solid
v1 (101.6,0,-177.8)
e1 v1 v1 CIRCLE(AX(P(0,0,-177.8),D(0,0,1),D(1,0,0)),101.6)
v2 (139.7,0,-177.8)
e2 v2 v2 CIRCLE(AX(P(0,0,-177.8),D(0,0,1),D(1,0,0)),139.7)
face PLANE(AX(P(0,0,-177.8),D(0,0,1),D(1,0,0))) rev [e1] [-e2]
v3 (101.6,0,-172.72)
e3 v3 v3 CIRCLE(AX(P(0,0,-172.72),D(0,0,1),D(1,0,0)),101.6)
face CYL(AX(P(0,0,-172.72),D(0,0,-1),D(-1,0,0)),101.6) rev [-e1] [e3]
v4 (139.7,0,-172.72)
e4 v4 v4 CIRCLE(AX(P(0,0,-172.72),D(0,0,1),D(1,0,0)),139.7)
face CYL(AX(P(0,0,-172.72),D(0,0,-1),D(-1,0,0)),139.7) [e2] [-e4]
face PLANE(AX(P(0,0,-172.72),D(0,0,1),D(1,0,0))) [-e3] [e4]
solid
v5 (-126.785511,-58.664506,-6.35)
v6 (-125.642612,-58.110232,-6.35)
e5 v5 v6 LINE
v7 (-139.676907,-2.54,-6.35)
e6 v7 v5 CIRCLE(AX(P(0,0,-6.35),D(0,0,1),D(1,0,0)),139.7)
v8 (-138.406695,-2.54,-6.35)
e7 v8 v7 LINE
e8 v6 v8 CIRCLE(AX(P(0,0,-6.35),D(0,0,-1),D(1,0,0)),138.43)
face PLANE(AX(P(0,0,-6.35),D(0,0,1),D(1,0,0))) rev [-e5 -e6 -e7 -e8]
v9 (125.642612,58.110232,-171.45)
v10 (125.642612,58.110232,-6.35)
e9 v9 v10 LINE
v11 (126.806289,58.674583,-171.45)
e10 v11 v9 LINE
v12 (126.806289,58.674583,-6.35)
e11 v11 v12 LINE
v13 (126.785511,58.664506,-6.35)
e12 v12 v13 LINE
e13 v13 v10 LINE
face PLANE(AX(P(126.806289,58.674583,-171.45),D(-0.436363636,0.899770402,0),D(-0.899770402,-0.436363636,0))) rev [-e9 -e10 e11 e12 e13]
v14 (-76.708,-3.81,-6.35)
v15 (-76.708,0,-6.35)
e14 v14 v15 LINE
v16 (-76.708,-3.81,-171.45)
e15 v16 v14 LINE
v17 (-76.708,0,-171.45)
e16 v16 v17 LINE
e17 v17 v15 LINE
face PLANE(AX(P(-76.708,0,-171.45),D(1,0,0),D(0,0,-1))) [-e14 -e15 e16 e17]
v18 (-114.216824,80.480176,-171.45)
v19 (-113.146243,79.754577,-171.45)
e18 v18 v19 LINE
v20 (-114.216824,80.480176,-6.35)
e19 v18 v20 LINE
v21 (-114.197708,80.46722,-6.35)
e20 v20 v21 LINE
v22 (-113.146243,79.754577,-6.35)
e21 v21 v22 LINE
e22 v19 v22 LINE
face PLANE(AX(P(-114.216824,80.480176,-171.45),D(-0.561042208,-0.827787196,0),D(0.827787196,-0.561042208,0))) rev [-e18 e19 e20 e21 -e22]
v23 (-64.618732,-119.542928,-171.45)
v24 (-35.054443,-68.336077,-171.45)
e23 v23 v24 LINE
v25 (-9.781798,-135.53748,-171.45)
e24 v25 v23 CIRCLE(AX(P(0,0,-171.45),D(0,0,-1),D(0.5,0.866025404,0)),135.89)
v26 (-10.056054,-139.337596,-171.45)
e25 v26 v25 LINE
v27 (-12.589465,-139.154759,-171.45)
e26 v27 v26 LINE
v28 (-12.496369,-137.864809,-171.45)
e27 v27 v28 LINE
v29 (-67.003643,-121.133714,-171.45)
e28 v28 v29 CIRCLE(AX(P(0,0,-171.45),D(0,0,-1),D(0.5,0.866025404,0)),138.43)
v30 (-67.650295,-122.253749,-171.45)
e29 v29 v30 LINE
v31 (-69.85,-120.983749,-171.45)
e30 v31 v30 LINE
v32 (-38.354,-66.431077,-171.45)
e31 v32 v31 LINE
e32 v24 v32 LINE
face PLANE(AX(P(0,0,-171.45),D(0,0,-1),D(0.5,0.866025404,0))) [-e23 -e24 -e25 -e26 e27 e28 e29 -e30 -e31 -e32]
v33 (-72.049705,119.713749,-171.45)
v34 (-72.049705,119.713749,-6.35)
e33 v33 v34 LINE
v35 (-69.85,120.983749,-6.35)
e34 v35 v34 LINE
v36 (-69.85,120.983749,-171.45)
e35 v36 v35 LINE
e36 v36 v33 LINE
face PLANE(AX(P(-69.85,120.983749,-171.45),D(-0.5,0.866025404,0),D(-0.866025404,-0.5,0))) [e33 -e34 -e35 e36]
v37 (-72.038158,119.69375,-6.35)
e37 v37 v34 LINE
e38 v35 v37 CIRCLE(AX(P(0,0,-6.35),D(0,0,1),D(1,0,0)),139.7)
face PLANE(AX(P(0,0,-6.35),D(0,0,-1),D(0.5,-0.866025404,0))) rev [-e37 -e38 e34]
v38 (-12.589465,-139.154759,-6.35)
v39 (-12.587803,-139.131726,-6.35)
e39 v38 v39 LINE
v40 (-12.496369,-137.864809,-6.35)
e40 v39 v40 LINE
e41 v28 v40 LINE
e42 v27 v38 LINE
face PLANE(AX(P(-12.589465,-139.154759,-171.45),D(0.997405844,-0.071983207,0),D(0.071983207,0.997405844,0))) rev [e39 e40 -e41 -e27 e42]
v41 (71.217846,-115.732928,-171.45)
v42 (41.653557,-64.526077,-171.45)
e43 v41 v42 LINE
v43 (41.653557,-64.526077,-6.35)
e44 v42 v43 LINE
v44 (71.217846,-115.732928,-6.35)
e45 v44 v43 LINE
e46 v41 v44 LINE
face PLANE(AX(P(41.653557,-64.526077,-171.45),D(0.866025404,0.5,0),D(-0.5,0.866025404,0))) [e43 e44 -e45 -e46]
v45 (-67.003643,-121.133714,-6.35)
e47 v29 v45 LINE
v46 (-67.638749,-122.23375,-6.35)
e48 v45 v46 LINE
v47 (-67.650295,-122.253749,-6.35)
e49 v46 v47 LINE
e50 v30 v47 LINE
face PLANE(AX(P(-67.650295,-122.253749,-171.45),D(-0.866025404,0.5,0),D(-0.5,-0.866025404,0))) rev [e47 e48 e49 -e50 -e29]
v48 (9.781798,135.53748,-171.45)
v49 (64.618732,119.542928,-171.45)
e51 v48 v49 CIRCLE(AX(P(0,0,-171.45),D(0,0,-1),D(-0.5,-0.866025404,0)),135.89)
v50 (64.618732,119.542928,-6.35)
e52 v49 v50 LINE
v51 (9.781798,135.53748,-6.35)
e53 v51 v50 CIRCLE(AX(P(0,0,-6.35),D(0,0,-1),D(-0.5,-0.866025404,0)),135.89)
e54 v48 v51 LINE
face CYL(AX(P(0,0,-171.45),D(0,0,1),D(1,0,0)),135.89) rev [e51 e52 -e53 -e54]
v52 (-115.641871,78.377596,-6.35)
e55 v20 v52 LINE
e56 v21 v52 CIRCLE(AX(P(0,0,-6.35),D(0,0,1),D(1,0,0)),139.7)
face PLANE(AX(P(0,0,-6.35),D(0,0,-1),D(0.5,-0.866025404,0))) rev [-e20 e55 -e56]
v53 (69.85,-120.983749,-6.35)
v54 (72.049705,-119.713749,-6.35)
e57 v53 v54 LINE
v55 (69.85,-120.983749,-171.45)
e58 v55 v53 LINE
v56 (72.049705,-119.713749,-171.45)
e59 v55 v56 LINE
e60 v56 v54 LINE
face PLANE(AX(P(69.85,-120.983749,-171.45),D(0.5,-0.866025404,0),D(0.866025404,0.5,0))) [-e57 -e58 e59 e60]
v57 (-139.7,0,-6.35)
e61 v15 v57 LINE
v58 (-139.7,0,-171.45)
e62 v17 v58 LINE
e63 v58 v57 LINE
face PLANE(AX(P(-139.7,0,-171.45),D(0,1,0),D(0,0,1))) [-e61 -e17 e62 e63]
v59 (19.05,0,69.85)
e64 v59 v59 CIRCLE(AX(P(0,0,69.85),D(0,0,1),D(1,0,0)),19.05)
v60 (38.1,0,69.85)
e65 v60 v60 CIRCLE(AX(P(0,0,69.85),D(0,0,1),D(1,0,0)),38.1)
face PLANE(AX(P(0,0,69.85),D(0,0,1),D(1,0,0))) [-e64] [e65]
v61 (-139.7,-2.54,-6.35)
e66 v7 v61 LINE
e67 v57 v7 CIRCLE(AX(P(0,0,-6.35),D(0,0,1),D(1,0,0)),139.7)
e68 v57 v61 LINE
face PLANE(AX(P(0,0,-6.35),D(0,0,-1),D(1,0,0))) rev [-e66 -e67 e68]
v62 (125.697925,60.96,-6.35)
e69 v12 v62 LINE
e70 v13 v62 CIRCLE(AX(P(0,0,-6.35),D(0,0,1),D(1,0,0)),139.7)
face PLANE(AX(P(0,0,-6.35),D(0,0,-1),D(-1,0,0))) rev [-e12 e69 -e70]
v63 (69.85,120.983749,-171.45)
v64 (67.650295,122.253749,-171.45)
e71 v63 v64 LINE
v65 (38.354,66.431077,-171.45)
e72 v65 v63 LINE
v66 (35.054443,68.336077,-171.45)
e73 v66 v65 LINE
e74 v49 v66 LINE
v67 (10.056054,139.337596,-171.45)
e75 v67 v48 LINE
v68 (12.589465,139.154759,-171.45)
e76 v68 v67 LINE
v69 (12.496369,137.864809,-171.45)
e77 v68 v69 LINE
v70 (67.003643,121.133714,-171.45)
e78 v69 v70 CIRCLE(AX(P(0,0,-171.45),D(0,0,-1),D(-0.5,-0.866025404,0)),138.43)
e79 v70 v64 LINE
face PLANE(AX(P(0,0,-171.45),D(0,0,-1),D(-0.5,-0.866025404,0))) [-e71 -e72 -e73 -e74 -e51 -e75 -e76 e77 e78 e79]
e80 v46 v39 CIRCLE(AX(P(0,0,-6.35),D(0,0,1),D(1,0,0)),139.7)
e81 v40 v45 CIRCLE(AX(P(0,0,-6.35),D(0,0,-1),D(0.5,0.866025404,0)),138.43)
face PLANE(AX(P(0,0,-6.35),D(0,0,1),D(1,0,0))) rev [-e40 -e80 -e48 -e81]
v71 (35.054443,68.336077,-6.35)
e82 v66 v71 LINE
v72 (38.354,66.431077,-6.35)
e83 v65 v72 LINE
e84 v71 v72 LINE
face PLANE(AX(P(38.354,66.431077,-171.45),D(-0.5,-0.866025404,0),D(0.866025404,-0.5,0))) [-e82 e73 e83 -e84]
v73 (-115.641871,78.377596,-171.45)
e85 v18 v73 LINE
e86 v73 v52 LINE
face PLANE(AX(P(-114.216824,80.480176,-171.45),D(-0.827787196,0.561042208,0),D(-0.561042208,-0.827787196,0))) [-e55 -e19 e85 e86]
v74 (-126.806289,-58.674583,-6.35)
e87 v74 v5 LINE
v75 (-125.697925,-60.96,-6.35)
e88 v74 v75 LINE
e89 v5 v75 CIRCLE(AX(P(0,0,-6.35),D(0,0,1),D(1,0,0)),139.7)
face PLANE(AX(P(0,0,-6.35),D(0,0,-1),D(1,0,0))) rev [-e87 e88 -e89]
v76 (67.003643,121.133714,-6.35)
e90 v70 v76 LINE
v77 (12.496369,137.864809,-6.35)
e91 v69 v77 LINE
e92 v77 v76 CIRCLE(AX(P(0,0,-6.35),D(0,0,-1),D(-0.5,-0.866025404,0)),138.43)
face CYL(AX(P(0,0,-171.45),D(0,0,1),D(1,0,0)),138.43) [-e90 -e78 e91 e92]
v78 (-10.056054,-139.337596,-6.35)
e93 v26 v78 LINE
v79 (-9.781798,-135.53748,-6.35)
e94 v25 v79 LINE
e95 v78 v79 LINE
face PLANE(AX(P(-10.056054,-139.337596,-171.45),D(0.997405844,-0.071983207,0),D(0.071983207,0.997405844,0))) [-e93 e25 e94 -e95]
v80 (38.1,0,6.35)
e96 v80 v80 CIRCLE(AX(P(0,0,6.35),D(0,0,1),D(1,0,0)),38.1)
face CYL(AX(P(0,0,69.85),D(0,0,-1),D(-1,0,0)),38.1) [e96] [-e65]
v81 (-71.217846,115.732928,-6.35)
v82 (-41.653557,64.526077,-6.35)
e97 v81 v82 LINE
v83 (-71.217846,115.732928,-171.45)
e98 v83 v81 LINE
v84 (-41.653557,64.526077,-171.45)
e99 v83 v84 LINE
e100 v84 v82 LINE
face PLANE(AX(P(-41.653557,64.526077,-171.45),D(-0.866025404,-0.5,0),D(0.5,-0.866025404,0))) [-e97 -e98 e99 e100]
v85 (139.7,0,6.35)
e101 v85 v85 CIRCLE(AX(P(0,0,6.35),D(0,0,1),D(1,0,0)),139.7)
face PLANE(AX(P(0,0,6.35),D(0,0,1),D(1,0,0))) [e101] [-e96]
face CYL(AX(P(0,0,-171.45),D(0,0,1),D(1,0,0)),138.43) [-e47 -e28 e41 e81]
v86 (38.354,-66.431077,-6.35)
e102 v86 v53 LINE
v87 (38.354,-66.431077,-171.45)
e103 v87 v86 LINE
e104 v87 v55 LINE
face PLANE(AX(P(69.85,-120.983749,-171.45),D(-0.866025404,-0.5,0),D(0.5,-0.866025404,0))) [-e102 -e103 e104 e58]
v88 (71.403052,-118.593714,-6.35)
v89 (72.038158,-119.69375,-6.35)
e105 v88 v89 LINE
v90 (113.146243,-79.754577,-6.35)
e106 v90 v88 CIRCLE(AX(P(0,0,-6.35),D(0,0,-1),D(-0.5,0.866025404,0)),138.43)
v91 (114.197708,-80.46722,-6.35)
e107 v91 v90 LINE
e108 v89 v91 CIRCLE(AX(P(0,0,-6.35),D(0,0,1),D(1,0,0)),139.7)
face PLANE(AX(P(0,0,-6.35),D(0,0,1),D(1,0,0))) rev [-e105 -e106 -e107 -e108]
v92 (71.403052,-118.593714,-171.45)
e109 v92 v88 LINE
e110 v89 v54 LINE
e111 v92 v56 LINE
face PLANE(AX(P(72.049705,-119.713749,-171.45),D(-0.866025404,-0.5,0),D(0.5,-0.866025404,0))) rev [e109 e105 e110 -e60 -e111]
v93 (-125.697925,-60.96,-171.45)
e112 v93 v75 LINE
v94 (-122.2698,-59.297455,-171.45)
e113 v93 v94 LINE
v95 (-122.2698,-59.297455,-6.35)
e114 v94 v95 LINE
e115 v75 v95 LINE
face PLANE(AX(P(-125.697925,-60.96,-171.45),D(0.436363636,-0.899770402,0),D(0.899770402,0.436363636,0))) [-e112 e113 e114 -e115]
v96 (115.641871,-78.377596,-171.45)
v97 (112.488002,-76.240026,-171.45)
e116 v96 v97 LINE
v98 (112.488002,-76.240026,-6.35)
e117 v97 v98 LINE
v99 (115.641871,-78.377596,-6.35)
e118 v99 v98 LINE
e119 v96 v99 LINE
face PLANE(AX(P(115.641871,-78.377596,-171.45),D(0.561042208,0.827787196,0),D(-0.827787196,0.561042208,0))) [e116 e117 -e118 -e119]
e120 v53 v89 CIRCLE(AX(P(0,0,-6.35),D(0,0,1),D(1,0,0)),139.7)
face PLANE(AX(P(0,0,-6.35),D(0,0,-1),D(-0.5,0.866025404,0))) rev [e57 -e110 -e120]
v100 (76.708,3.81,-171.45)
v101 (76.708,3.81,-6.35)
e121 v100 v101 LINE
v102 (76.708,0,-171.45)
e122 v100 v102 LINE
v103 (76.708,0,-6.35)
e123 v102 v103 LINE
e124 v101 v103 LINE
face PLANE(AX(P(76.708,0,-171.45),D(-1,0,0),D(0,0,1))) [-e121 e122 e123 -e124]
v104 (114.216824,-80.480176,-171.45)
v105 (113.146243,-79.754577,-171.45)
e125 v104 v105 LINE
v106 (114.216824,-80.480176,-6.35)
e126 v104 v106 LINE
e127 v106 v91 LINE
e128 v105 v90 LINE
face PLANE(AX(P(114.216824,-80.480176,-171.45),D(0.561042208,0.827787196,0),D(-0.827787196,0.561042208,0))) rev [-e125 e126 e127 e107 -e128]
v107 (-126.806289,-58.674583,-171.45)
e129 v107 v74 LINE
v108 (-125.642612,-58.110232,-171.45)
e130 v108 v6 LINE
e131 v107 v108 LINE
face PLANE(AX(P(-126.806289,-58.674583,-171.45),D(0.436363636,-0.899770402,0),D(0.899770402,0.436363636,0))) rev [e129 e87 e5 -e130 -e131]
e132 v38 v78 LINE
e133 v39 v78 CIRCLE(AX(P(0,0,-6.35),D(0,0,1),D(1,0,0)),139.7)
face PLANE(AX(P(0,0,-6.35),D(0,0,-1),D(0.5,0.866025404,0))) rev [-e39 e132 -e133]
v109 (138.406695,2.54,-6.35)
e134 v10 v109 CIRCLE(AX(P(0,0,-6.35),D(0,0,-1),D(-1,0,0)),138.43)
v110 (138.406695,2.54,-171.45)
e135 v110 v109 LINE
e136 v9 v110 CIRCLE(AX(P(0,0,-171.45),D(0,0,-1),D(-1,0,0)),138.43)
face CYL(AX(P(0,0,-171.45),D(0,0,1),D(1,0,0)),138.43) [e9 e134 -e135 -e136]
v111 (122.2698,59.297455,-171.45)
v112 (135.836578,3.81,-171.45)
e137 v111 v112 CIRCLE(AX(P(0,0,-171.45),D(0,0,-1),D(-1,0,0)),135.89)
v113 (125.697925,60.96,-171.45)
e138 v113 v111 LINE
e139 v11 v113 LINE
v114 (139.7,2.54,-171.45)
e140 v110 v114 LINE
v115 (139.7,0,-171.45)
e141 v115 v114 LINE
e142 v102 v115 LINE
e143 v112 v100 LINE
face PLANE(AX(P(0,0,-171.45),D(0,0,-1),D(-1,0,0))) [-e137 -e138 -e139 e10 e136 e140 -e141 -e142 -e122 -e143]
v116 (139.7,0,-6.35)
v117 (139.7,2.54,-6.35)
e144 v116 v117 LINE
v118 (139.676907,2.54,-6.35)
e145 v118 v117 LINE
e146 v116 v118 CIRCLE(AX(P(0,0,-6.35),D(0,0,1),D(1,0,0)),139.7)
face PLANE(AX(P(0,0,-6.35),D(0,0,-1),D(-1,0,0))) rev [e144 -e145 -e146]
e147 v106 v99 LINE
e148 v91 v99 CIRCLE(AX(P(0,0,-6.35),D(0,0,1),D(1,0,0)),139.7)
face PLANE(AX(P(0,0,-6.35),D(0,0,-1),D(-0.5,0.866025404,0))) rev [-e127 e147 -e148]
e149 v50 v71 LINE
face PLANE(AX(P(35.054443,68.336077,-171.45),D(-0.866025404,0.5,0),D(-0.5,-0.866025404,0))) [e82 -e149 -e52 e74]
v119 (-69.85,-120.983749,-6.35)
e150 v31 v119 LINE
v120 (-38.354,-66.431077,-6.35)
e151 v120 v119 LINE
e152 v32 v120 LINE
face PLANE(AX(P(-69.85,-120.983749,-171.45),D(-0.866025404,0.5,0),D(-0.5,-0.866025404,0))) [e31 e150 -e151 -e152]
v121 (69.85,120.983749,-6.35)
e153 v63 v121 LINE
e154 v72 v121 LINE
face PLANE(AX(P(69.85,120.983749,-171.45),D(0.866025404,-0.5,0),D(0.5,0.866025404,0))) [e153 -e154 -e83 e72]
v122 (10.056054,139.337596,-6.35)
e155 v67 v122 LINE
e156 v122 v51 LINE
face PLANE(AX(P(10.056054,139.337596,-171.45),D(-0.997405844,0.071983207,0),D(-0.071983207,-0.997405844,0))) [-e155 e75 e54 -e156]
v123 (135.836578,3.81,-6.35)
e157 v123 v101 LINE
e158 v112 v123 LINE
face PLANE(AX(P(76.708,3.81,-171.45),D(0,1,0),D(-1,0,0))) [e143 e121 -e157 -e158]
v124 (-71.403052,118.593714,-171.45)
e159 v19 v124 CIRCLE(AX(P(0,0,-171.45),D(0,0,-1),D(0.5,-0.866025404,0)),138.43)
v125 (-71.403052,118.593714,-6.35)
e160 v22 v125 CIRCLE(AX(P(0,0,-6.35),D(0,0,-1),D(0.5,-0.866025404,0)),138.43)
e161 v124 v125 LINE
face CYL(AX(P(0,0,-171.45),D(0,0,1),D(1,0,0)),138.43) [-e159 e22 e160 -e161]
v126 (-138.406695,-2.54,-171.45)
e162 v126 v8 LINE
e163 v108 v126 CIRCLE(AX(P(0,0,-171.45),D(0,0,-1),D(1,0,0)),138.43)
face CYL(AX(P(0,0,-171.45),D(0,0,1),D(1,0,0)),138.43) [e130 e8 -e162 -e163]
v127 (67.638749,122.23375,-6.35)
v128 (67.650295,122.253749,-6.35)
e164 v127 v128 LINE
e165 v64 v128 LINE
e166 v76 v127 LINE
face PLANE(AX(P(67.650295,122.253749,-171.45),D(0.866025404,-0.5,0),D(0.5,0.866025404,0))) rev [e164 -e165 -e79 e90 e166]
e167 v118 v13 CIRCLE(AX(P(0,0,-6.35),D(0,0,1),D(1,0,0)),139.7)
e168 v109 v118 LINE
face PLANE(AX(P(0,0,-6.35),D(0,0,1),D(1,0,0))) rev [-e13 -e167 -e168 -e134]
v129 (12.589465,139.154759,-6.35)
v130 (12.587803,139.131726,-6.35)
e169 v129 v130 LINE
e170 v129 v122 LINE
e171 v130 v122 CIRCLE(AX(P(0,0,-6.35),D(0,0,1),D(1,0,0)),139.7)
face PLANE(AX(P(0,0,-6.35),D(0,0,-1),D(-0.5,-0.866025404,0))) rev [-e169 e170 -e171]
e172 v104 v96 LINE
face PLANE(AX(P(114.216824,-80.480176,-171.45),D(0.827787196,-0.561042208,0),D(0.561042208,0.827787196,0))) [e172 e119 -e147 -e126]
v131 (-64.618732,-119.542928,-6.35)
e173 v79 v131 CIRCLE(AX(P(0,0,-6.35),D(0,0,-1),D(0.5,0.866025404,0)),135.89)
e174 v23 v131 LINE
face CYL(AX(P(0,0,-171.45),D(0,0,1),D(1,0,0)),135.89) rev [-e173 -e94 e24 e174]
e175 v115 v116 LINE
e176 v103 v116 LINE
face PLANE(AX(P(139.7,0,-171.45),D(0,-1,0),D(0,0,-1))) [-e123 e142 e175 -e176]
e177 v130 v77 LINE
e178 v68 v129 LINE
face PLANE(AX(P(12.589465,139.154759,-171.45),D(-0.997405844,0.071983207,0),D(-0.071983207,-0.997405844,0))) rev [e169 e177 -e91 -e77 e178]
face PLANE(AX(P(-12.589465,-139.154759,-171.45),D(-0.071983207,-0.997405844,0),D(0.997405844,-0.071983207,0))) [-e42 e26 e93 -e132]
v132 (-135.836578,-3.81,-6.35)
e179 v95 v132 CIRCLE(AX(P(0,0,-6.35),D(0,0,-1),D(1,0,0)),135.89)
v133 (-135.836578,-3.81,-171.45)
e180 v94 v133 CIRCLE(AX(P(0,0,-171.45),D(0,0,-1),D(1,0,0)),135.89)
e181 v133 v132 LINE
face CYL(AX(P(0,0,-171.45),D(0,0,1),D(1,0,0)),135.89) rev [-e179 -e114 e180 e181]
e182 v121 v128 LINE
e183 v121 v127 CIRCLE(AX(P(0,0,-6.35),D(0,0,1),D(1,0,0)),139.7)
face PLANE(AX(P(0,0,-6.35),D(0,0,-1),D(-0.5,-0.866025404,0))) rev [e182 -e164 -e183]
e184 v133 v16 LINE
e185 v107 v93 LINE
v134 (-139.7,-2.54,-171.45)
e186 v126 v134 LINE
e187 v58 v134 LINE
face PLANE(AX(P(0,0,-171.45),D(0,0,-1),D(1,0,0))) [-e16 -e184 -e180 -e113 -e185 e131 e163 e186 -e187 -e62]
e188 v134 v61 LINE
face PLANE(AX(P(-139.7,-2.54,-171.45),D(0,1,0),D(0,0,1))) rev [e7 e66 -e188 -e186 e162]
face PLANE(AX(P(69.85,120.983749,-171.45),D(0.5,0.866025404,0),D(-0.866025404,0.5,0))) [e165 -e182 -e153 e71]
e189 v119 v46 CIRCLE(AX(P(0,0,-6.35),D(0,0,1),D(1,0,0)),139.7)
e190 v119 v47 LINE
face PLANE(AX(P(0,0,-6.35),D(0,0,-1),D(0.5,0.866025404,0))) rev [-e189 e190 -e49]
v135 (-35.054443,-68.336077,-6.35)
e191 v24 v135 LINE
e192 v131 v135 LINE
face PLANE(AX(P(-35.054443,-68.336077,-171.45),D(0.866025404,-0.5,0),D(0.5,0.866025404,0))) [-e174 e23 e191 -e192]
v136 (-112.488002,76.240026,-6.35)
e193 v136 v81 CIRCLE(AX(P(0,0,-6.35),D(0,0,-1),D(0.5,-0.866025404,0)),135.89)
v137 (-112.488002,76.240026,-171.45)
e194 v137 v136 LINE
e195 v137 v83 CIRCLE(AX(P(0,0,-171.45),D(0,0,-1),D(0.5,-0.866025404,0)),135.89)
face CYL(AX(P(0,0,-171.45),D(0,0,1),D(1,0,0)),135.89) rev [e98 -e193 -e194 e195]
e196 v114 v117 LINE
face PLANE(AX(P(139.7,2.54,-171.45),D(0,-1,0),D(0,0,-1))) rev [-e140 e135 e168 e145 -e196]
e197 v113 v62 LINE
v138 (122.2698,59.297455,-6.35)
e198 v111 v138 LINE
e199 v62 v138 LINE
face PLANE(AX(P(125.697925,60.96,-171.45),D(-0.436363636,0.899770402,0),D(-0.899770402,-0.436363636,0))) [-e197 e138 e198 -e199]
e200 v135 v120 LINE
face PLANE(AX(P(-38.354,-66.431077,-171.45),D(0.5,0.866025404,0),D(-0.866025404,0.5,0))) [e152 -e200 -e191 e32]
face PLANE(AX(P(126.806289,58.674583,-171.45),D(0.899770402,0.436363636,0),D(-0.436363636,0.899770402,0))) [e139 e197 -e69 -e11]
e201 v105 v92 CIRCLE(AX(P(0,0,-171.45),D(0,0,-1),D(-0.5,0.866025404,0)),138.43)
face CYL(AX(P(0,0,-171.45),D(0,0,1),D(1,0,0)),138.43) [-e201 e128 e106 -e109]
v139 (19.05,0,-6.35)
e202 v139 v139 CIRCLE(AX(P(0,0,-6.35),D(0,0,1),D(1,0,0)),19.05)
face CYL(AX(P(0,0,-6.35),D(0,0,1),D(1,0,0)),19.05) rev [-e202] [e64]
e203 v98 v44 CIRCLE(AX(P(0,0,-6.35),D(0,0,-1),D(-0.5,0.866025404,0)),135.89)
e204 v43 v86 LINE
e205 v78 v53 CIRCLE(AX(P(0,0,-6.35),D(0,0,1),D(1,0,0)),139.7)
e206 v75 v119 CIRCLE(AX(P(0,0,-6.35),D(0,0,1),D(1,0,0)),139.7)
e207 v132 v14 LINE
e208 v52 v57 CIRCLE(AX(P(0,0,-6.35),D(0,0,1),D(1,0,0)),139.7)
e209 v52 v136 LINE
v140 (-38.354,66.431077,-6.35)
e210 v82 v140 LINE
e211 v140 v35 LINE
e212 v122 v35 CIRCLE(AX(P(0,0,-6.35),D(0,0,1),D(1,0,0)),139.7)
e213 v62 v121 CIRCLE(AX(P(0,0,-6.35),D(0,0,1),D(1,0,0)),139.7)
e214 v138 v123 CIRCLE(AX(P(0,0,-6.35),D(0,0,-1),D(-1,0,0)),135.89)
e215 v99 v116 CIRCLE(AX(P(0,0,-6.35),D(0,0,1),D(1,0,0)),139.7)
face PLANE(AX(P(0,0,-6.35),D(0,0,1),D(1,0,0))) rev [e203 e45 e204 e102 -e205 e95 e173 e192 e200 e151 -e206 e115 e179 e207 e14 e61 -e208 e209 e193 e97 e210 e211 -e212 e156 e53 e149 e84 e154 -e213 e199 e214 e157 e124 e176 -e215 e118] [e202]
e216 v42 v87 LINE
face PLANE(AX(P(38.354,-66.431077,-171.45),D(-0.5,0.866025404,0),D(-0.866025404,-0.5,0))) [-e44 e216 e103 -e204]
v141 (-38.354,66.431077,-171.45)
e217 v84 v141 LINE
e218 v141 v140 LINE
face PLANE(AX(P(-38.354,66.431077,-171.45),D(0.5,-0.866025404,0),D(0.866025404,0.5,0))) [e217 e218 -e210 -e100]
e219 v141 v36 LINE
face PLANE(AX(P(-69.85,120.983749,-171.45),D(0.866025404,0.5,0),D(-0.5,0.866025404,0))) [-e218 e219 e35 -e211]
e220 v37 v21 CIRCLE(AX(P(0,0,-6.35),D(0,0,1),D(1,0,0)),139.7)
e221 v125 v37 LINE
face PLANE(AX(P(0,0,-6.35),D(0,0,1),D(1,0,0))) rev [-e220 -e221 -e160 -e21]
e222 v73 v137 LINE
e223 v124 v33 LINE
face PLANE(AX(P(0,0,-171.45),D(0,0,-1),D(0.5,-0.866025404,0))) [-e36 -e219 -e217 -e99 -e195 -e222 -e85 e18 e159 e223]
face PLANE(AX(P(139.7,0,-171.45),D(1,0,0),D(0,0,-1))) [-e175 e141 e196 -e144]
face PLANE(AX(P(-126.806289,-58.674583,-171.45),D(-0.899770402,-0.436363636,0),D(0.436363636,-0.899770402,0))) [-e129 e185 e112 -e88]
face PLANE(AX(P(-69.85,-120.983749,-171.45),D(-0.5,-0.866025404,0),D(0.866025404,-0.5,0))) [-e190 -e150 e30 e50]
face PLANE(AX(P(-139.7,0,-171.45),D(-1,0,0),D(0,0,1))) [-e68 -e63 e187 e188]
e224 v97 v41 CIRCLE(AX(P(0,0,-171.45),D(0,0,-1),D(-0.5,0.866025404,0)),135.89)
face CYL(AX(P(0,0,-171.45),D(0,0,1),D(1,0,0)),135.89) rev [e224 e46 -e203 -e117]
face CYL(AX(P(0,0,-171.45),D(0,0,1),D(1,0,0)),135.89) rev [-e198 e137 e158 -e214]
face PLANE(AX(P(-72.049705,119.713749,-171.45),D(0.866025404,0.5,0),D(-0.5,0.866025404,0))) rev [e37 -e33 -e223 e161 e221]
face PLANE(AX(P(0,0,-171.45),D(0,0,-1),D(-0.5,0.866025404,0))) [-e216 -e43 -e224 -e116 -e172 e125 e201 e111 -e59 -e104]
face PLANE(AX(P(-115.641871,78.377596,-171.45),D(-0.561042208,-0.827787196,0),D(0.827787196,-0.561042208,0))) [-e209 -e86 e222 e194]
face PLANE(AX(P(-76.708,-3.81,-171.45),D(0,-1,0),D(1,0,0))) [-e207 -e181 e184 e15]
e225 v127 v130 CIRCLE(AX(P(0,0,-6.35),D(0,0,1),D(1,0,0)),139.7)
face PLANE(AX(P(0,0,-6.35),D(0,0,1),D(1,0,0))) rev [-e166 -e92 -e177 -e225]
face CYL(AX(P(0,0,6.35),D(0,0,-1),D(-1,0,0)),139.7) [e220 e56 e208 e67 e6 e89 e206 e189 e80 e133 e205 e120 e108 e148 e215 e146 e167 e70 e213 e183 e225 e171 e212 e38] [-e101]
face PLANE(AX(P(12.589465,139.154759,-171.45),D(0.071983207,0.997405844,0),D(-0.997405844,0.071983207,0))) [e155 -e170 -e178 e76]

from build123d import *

# Parameters (mm, degrees)
SKETCH1_R           = 139.7
BOSS_EXTRUDE1_DEPTH = 6.35
SKETCH2_R           = 38.1
BOSS_EXTRUDE2_DEPTH = 63.5
SKETCH3_R           = 19.05
CUT_EXTRUDE1_DEPTH  = 212.751316407
EXTRUDE_THIN1_DEPTH = 165.1
CIRPATTERN1_COUNT   = 6
SKETCH6_R           = 139.7
SKETCH6_R_2         = 101.6
BOSS_EXTRUDE3_DEPTH = 5.08


# Read off the part's stored shape, not the designer's step: Extrude-Thin1
with BuildPart() as part:
    # Sketch1 → Boss-Extrude1 (new, symmetric)
    with BuildSketch(Plane.XY):
        Circle(SKETCH1_R)
    extrude(amount=BOSS_EXTRUDE1_DEPTH, both=True)

    # Sketch2 → Boss-Extrude2 (add)
    with BuildSketch(Plane.XY.offset(6.35)):
        Circle(SKETCH2_R)
    extrude(amount=BOSS_EXTRUDE2_DEPTH)

    # Sketch3 → Cut-Extrude1 (cut, through all)
    with BuildSketch(Plane.XY.offset(69.85)):
        Circle(SKETCH3_R)
    extrude(amount=-CUT_EXTRUDE1_DEPTH, mode=Mode.SUBTRACT)

    # Extrude-Thin1 outline → Extrude-Thin1 (add)
    with BuildSketch(Plane(origin=(0, 0, -6.35), x_dir=(-1, 0, 0), z_dir=(0, 0, -1))):
        with BuildLine():
            Line((-138.406695286, 2.54), (-139.7, 2.54))
            Line((-139.7, 2.54), (-139.7, 0))
            Line((-139.7, 0), (-76.708, 0))
            Line((-76.708, 0), (-76.708, 3.81))
            Line((-76.708, 3.81), (-135.836578284, 3.81))
            ThreePointArc((-135.836578284, 3.81), (-132.001666757, 32.274635137), (-122.269799969, 59.297454545))
            Line((-122.269799969, 59.297454545), (-125.697925202, 60.96))
            Line((-125.697925202, 60.96), (-126.806288838, 58.674583178))
            Line((-126.806288838, 58.674583178), (-125.642611535, 58.11023203))
            ThreePointArc((-125.642611535, 58.11023203), (-134.916721648, 30.989403347), (-138.406695286, 2.54))
        make_face()
    extrude_thin1 = extrude(amount=EXTRUDE_THIN1_DEPTH)

    # CirPattern1: Extrude-Thin1 ×6 about axis
    cirpattern1_axis = Axis((0, 0, 0), (0, 0, 1))
    for i in range(1, CIRPATTERN1_COUNT):
        add(extrude_thin1.rotate(cirpattern1_axis, i * 360 / CIRPATTERN1_COUNT))


with BuildPart() as body_2:
    # Sketch6 → Boss-Extrude3 (new body)
    with BuildSketch(Plane.XY.offset(-177.8)):
        Circle(SKETCH6_R)
        Circle(SKETCH6_R_2, mode=Mode.SUBTRACT)
    extrude(amount=BOSS_EXTRUDE3_DEPTH)


solid = Compound([part.part, body_2.part])
